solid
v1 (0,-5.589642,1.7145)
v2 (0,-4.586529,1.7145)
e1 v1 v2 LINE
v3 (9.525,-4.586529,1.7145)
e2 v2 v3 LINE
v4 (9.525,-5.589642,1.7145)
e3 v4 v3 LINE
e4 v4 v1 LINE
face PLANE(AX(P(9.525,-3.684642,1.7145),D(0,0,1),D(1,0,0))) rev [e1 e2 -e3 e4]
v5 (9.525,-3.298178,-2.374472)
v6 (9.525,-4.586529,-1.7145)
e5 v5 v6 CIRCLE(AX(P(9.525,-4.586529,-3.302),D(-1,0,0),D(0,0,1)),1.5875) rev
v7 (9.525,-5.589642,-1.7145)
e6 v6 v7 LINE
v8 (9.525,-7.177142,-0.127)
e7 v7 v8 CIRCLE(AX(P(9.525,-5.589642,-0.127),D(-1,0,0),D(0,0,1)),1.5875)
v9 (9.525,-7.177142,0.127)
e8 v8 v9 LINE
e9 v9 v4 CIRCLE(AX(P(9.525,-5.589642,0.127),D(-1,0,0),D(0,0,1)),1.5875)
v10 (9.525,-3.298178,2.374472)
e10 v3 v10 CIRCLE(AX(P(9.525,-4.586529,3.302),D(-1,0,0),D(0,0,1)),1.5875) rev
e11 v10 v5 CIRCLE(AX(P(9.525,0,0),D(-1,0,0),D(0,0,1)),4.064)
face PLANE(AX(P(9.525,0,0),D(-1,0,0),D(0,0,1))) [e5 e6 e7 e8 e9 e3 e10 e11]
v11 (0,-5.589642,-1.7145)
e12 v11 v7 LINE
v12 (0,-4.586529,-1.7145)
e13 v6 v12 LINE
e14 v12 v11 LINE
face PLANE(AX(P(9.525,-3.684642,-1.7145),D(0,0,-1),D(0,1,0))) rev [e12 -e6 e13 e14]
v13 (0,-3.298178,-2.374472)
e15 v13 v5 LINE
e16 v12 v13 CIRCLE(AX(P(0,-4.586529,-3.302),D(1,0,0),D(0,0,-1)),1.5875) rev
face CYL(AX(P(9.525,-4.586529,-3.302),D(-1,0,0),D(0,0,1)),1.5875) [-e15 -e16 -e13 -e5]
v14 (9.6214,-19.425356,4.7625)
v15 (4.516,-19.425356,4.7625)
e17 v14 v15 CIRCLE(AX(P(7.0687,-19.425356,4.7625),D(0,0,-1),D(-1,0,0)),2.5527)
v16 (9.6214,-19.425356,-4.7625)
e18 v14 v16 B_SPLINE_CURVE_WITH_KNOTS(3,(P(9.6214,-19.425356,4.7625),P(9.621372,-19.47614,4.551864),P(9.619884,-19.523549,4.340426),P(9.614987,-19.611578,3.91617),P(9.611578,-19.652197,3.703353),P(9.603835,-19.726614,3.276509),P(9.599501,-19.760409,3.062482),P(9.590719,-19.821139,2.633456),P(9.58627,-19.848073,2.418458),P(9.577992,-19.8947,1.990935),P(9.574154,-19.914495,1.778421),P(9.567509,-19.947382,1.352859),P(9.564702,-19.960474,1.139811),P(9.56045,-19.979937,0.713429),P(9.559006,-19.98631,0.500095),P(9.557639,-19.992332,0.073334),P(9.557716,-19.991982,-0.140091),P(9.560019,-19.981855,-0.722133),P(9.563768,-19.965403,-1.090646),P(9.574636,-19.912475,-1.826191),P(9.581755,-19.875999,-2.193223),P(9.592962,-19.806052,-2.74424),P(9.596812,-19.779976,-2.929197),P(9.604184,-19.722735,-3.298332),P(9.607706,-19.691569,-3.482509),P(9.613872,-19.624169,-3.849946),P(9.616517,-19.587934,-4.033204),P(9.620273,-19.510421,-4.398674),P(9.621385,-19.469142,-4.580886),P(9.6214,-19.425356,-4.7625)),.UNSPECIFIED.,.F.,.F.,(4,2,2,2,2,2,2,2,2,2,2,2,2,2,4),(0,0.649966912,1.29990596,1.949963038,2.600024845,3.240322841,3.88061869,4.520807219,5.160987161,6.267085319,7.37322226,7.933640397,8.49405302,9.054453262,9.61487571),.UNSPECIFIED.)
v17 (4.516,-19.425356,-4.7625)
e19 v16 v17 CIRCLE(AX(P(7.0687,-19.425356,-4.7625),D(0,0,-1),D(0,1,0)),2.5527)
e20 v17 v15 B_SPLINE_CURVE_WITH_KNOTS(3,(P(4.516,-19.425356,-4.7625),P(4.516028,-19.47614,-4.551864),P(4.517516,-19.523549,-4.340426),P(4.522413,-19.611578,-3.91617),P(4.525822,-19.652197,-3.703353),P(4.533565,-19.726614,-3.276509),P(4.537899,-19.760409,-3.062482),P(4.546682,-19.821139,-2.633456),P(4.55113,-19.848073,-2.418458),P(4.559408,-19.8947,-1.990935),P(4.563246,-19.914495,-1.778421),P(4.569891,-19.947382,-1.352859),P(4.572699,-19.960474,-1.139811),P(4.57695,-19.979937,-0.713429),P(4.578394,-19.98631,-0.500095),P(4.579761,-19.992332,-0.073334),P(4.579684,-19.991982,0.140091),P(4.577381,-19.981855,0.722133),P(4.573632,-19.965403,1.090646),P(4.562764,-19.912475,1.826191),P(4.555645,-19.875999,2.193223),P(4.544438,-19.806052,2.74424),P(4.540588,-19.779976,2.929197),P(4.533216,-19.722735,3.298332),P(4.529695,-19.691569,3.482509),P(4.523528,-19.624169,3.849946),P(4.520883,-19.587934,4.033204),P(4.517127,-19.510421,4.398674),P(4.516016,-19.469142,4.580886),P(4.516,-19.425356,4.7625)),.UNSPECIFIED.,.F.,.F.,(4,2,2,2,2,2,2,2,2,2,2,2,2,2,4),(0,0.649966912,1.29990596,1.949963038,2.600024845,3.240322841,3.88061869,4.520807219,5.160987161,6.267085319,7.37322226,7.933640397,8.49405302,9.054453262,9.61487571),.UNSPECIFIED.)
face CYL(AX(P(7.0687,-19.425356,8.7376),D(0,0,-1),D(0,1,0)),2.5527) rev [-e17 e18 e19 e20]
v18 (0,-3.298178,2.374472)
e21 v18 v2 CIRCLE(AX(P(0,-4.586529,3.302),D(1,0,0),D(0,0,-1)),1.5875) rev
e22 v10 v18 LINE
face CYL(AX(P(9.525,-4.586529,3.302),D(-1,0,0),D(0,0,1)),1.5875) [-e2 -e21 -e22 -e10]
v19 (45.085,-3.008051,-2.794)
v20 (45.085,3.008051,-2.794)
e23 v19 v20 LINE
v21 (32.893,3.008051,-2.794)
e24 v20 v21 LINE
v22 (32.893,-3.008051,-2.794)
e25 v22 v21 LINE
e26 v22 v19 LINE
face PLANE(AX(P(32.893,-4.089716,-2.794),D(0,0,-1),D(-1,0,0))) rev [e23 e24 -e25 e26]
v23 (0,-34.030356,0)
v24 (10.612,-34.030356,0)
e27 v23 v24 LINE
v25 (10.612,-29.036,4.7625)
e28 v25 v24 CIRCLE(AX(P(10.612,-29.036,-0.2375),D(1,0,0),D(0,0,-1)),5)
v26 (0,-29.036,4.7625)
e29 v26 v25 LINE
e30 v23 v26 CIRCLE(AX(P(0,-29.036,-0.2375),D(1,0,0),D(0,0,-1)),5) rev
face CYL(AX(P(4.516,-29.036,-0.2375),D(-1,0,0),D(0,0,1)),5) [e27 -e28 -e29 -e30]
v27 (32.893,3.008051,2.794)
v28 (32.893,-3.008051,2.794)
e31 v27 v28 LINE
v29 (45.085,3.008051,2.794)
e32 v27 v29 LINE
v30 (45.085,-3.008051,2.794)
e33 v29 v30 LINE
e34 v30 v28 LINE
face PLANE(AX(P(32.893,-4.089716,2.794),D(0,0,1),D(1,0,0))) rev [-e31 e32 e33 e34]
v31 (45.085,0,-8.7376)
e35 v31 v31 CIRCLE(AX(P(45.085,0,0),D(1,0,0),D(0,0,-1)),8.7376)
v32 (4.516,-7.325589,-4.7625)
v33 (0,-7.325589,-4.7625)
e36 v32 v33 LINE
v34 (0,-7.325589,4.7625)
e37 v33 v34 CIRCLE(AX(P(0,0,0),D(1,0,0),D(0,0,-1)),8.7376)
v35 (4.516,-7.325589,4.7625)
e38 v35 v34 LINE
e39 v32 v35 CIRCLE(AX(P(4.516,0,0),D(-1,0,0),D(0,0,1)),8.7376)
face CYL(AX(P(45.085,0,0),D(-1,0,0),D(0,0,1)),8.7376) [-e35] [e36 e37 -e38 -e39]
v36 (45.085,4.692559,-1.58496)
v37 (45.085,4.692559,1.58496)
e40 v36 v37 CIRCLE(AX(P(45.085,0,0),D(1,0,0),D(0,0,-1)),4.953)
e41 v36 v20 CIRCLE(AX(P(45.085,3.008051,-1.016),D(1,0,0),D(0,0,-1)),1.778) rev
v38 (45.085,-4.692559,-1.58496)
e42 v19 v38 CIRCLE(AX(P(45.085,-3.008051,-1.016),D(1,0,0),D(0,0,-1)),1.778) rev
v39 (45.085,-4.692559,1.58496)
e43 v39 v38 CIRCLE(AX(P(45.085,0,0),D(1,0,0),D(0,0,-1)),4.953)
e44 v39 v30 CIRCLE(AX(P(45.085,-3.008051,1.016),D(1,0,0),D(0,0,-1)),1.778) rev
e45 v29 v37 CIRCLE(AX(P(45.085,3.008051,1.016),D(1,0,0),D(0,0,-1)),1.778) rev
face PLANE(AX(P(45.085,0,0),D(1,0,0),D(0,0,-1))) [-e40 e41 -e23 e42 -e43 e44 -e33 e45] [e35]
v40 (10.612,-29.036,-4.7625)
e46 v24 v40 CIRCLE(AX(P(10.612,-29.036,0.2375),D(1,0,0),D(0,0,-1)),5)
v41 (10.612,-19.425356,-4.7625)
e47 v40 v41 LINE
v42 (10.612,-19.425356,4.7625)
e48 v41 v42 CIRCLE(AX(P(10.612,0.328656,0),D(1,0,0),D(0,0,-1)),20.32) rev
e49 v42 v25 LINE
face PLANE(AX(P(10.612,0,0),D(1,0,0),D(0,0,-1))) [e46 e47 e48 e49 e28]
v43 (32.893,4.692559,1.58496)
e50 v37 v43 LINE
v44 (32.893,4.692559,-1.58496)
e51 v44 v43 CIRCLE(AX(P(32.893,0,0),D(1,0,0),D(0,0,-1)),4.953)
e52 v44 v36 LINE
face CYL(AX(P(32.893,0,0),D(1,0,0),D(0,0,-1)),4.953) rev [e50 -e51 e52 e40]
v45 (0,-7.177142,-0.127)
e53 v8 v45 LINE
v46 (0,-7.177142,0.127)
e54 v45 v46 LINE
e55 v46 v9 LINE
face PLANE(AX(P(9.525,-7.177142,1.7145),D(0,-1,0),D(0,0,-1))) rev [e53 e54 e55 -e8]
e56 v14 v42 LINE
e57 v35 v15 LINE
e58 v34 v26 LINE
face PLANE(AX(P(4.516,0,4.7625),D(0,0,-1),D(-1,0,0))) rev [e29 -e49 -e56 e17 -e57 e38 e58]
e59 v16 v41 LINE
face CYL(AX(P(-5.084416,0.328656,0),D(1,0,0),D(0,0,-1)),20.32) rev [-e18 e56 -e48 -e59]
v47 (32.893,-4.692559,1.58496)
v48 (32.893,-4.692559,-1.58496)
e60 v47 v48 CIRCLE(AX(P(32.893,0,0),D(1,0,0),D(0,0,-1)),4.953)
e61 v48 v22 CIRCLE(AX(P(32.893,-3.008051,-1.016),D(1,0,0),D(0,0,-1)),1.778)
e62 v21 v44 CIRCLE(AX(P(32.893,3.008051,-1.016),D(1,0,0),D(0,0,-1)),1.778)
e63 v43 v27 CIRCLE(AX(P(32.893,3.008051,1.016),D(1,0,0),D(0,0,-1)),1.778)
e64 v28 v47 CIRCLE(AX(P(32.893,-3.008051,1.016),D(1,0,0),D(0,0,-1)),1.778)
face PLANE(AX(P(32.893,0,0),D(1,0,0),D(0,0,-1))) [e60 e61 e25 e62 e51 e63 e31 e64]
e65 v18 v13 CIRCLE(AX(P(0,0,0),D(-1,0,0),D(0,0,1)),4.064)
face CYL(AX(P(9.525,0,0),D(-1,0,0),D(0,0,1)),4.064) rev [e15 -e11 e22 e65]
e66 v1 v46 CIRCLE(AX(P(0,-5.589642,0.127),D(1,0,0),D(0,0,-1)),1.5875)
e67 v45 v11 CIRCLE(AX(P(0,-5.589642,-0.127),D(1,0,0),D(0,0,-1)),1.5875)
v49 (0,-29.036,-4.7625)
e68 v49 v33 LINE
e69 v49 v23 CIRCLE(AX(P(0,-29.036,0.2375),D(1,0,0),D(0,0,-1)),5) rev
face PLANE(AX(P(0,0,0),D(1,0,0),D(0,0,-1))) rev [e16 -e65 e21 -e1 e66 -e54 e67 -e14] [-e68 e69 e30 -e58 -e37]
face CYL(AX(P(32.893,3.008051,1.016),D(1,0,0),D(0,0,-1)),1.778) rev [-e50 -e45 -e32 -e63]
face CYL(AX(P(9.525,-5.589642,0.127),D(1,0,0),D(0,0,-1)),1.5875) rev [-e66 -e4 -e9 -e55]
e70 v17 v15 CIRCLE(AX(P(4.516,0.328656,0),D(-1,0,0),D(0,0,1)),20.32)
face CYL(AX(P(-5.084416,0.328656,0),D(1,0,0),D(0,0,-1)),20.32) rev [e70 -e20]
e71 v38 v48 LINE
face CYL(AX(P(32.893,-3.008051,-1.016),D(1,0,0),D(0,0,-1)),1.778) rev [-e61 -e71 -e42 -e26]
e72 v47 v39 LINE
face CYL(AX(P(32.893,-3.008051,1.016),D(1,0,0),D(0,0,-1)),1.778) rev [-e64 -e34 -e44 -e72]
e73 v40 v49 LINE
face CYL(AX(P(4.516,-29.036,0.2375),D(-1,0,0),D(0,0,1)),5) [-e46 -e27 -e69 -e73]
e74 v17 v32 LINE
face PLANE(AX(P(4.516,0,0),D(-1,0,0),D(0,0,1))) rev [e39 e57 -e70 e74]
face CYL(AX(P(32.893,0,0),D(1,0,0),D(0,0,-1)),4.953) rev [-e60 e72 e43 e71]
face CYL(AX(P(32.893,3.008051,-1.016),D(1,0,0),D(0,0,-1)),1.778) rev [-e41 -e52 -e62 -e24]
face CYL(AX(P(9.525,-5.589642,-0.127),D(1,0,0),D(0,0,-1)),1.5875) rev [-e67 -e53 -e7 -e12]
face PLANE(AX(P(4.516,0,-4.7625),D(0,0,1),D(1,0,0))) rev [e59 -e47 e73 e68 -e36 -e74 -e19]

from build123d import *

# Parameters (mm, degrees)
SKETCH1_R           = 8.7376
BOSS_EXTRUDE1_DEPTH = 45.085
BOSS_EXTRUDE3_DEPTH = 4.516000112
FILLET2_R           = 5
BOSS_EXTRUDE4_DEPTH = 6.096
CUT_EXTRUDE8_DEPTH  = 6.096
CUT_EXTRUDE10_DEPTH = 12.192
FILLET11_R          = 1.778
SKETCH25_R          = 2.5527
CUT_EXTRUDE14_DEPTH = 59.077319733
CUT_EXTRUDE15_DEPTH = 9.525
FILLET12_R          = 1.5875


with BuildPart() as part:
    # Sketch1 → Boss-Extrude1 (new body)
    with BuildSketch(Plane.YZ):
        with Locations(Location((0, 0, 0), (0, 0, 270))):
            Circle(SKETCH1_R)
    extrude(amount=BOSS_EXTRUDE1_DEPTH)

    # Sketch10 → Boss-Extrude3 (add)
    with BuildSketch(Plane(origin=(0, 0, 0), x_dir=(0, -1, 0), z_dir=(-1, 0, 0))):
        with BuildLine():
            Line((7.325588544, 4.7625), (34.036, 4.7625))
            Line((34.036, 4.7625), (34.036, -4.7625))
            Line((34.036, -4.7625), (7.325588544, -4.7625))
            ThreePointArc((7.325588544, -4.7625), (8.7376, 0), (7.325588544, 4.7625))
        make_face()
    extrude(amount=-BOSS_EXTRUDE3_DEPTH)

    # Fillet2
    # the kernel refuses this fillet: 5 mm, written as the material it takes off along each edge
    with BuildSketch(Plane(origin=(-12.5, -34.036, 4.7625), x_dir=(0, 1, 0), z_dir=(1, 0, 0))) as fillet2_piece_1:
        with BuildLine():
            CenterArc((FILLET2_R, -FILLET2_R), FILLET2_R, 90, 90)
            Line((0, -FILLET2_R), (0, 0))
            Line((0, 0), (FILLET2_R, 0))
        make_face()
    extrude(amount=29.516000112, mode=Mode.SUBTRACT)
    with BuildSketch(Plane(origin=(-12.5, -34.036, -4.7625), x_dir=(0, 1, 0), z_dir=(1, 0, 0))) as fillet2_piece_2:
        with BuildLine():
            CenterArc((FILLET2_R, FILLET2_R), FILLET2_R, 180, 90)
            Line((0, FILLET2_R), (0, 0))
            Line((0, 0), (FILLET2_R, 0))
        make_face()
    extrude(amount=29.516000112, mode=Mode.SUBTRACT)

    # Sketch15 → Boss-Extrude4 (add)
    with BuildSketch(Plane.YZ.offset(4.516000112)):
        with BuildLine():
            Line((-18.79035619, -4.7625), (-18.79035619, 4.7625))
            Line((-18.79035619, 4.7625), (-29.036, 4.7625))
            ThreePointArc((-29.036, 4.7625), (-32.486543435, 3.381028707), (-34.03035619, 0))
            ThreePointArc((-34.03035619, 0), (-32.486543435, -3.381028707), (-29.036, -4.7625))
            Line((-29.036, -4.7625), (-18.79035619, -4.7625))
        make_face()
    extrude(amount=BOSS_EXTRUDE4_DEPTH)

    # Sketch21 → Cut-Extrude8 (cut)
    with BuildSketch(Plane.YZ.offset(10.612000112)):
        with BuildLine():
            Line((-19.42535619, -4.7625), (-18.79035619, -4.7625))
            Line((-18.79035619, -4.7625), (-18.79035619, 4.7625))
            Line((-18.79035619, 4.7625), (-19.42535619, 4.7625))
            ThreePointArc((-19.42535619, 4.7625), (-19.991344097, 0), (-19.42535619, -4.7625))
        make_face()
    extrude(amount=-CUT_EXTRUDE8_DEPTH, mode=Mode.SUBTRACT)

    # Sketch22 → Cut-Extrude10 (cut)
    with BuildSketch(Plane.YZ.offset(45.085)):
        with BuildLine():
            Line((-4.089715516, -2.794), (4.089715516, -2.794))
            ThreePointArc((4.089715516, -2.794), (4.953, 0), (4.089715516, 2.794))
            Line((4.089715516, 2.794), (-4.089715516, 2.794))
            ThreePointArc((-4.089715516, 2.794), (-4.953, 0), (-4.089715516, -2.794))
        make_face()
    extrude(amount=-CUT_EXTRUDE10_DEPTH, mode=Mode.SUBTRACT)

    # Fillet11
    fillet11_edges = [part.edges().sort_by_distance(p)[0] for p in [
        (38.989, 4.089715516, 2.794),
        (38.989, 4.089715516, -2.794),
        (38.989, -4.089715516, -2.794),
        (38.989, -4.089715516, 2.794),
    ]]
    fillet(fillet11_edges, radius=FILLET11_R)

    # Sketch25 → Cut-Extrude14 (cut, through all)
    with BuildSketch(Plane(origin=(0, 0, -4.7625), x_dir=(1, 0, 0), z_dir=(0, 0, -1))):
        with Locations((7.068700112, 19.42535619)):
            Circle(SKETCH25_R)
    extrude(amount=-CUT_EXTRUDE14_DEPTH, mode=Mode.SUBTRACT)

    # Sketch26 → Cut-Extrude15 (cut)
    with BuildSketch(Plane(origin=(0, 0, 0), x_dir=(0, -1, 0), z_dir=(-1, 0, 0))):
        with BuildLine():
            Line((3.684641875, 1.7145), (7.177141875, 1.7145))
            Line((7.177141875, 1.7145), (7.177141875, -1.7145))
            Line((7.177141875, -1.7145), (3.684641875, -1.7145))
            ThreePointArc((3.684641875, -1.7145), (-4.064, 0), (3.684641875, 1.7145))
        make_face()
    extrude(amount=-CUT_EXTRUDE15_DEPTH, mode=Mode.SUBTRACT)

    # Fillet12
    fillet12_edges = [part.edges().sort_by_distance(p)[0] for p in [
        (4.7625, -3.684641875, -1.7145),
        (4.7625, -3.684641875, 1.7145),
        (4.7625, -7.177141875, 1.7145),
        (4.7625, -7.177141875, -1.7145),
    ]]
    fillet(fillet12_edges, radius=FILLET12_R)


solid = part.part
